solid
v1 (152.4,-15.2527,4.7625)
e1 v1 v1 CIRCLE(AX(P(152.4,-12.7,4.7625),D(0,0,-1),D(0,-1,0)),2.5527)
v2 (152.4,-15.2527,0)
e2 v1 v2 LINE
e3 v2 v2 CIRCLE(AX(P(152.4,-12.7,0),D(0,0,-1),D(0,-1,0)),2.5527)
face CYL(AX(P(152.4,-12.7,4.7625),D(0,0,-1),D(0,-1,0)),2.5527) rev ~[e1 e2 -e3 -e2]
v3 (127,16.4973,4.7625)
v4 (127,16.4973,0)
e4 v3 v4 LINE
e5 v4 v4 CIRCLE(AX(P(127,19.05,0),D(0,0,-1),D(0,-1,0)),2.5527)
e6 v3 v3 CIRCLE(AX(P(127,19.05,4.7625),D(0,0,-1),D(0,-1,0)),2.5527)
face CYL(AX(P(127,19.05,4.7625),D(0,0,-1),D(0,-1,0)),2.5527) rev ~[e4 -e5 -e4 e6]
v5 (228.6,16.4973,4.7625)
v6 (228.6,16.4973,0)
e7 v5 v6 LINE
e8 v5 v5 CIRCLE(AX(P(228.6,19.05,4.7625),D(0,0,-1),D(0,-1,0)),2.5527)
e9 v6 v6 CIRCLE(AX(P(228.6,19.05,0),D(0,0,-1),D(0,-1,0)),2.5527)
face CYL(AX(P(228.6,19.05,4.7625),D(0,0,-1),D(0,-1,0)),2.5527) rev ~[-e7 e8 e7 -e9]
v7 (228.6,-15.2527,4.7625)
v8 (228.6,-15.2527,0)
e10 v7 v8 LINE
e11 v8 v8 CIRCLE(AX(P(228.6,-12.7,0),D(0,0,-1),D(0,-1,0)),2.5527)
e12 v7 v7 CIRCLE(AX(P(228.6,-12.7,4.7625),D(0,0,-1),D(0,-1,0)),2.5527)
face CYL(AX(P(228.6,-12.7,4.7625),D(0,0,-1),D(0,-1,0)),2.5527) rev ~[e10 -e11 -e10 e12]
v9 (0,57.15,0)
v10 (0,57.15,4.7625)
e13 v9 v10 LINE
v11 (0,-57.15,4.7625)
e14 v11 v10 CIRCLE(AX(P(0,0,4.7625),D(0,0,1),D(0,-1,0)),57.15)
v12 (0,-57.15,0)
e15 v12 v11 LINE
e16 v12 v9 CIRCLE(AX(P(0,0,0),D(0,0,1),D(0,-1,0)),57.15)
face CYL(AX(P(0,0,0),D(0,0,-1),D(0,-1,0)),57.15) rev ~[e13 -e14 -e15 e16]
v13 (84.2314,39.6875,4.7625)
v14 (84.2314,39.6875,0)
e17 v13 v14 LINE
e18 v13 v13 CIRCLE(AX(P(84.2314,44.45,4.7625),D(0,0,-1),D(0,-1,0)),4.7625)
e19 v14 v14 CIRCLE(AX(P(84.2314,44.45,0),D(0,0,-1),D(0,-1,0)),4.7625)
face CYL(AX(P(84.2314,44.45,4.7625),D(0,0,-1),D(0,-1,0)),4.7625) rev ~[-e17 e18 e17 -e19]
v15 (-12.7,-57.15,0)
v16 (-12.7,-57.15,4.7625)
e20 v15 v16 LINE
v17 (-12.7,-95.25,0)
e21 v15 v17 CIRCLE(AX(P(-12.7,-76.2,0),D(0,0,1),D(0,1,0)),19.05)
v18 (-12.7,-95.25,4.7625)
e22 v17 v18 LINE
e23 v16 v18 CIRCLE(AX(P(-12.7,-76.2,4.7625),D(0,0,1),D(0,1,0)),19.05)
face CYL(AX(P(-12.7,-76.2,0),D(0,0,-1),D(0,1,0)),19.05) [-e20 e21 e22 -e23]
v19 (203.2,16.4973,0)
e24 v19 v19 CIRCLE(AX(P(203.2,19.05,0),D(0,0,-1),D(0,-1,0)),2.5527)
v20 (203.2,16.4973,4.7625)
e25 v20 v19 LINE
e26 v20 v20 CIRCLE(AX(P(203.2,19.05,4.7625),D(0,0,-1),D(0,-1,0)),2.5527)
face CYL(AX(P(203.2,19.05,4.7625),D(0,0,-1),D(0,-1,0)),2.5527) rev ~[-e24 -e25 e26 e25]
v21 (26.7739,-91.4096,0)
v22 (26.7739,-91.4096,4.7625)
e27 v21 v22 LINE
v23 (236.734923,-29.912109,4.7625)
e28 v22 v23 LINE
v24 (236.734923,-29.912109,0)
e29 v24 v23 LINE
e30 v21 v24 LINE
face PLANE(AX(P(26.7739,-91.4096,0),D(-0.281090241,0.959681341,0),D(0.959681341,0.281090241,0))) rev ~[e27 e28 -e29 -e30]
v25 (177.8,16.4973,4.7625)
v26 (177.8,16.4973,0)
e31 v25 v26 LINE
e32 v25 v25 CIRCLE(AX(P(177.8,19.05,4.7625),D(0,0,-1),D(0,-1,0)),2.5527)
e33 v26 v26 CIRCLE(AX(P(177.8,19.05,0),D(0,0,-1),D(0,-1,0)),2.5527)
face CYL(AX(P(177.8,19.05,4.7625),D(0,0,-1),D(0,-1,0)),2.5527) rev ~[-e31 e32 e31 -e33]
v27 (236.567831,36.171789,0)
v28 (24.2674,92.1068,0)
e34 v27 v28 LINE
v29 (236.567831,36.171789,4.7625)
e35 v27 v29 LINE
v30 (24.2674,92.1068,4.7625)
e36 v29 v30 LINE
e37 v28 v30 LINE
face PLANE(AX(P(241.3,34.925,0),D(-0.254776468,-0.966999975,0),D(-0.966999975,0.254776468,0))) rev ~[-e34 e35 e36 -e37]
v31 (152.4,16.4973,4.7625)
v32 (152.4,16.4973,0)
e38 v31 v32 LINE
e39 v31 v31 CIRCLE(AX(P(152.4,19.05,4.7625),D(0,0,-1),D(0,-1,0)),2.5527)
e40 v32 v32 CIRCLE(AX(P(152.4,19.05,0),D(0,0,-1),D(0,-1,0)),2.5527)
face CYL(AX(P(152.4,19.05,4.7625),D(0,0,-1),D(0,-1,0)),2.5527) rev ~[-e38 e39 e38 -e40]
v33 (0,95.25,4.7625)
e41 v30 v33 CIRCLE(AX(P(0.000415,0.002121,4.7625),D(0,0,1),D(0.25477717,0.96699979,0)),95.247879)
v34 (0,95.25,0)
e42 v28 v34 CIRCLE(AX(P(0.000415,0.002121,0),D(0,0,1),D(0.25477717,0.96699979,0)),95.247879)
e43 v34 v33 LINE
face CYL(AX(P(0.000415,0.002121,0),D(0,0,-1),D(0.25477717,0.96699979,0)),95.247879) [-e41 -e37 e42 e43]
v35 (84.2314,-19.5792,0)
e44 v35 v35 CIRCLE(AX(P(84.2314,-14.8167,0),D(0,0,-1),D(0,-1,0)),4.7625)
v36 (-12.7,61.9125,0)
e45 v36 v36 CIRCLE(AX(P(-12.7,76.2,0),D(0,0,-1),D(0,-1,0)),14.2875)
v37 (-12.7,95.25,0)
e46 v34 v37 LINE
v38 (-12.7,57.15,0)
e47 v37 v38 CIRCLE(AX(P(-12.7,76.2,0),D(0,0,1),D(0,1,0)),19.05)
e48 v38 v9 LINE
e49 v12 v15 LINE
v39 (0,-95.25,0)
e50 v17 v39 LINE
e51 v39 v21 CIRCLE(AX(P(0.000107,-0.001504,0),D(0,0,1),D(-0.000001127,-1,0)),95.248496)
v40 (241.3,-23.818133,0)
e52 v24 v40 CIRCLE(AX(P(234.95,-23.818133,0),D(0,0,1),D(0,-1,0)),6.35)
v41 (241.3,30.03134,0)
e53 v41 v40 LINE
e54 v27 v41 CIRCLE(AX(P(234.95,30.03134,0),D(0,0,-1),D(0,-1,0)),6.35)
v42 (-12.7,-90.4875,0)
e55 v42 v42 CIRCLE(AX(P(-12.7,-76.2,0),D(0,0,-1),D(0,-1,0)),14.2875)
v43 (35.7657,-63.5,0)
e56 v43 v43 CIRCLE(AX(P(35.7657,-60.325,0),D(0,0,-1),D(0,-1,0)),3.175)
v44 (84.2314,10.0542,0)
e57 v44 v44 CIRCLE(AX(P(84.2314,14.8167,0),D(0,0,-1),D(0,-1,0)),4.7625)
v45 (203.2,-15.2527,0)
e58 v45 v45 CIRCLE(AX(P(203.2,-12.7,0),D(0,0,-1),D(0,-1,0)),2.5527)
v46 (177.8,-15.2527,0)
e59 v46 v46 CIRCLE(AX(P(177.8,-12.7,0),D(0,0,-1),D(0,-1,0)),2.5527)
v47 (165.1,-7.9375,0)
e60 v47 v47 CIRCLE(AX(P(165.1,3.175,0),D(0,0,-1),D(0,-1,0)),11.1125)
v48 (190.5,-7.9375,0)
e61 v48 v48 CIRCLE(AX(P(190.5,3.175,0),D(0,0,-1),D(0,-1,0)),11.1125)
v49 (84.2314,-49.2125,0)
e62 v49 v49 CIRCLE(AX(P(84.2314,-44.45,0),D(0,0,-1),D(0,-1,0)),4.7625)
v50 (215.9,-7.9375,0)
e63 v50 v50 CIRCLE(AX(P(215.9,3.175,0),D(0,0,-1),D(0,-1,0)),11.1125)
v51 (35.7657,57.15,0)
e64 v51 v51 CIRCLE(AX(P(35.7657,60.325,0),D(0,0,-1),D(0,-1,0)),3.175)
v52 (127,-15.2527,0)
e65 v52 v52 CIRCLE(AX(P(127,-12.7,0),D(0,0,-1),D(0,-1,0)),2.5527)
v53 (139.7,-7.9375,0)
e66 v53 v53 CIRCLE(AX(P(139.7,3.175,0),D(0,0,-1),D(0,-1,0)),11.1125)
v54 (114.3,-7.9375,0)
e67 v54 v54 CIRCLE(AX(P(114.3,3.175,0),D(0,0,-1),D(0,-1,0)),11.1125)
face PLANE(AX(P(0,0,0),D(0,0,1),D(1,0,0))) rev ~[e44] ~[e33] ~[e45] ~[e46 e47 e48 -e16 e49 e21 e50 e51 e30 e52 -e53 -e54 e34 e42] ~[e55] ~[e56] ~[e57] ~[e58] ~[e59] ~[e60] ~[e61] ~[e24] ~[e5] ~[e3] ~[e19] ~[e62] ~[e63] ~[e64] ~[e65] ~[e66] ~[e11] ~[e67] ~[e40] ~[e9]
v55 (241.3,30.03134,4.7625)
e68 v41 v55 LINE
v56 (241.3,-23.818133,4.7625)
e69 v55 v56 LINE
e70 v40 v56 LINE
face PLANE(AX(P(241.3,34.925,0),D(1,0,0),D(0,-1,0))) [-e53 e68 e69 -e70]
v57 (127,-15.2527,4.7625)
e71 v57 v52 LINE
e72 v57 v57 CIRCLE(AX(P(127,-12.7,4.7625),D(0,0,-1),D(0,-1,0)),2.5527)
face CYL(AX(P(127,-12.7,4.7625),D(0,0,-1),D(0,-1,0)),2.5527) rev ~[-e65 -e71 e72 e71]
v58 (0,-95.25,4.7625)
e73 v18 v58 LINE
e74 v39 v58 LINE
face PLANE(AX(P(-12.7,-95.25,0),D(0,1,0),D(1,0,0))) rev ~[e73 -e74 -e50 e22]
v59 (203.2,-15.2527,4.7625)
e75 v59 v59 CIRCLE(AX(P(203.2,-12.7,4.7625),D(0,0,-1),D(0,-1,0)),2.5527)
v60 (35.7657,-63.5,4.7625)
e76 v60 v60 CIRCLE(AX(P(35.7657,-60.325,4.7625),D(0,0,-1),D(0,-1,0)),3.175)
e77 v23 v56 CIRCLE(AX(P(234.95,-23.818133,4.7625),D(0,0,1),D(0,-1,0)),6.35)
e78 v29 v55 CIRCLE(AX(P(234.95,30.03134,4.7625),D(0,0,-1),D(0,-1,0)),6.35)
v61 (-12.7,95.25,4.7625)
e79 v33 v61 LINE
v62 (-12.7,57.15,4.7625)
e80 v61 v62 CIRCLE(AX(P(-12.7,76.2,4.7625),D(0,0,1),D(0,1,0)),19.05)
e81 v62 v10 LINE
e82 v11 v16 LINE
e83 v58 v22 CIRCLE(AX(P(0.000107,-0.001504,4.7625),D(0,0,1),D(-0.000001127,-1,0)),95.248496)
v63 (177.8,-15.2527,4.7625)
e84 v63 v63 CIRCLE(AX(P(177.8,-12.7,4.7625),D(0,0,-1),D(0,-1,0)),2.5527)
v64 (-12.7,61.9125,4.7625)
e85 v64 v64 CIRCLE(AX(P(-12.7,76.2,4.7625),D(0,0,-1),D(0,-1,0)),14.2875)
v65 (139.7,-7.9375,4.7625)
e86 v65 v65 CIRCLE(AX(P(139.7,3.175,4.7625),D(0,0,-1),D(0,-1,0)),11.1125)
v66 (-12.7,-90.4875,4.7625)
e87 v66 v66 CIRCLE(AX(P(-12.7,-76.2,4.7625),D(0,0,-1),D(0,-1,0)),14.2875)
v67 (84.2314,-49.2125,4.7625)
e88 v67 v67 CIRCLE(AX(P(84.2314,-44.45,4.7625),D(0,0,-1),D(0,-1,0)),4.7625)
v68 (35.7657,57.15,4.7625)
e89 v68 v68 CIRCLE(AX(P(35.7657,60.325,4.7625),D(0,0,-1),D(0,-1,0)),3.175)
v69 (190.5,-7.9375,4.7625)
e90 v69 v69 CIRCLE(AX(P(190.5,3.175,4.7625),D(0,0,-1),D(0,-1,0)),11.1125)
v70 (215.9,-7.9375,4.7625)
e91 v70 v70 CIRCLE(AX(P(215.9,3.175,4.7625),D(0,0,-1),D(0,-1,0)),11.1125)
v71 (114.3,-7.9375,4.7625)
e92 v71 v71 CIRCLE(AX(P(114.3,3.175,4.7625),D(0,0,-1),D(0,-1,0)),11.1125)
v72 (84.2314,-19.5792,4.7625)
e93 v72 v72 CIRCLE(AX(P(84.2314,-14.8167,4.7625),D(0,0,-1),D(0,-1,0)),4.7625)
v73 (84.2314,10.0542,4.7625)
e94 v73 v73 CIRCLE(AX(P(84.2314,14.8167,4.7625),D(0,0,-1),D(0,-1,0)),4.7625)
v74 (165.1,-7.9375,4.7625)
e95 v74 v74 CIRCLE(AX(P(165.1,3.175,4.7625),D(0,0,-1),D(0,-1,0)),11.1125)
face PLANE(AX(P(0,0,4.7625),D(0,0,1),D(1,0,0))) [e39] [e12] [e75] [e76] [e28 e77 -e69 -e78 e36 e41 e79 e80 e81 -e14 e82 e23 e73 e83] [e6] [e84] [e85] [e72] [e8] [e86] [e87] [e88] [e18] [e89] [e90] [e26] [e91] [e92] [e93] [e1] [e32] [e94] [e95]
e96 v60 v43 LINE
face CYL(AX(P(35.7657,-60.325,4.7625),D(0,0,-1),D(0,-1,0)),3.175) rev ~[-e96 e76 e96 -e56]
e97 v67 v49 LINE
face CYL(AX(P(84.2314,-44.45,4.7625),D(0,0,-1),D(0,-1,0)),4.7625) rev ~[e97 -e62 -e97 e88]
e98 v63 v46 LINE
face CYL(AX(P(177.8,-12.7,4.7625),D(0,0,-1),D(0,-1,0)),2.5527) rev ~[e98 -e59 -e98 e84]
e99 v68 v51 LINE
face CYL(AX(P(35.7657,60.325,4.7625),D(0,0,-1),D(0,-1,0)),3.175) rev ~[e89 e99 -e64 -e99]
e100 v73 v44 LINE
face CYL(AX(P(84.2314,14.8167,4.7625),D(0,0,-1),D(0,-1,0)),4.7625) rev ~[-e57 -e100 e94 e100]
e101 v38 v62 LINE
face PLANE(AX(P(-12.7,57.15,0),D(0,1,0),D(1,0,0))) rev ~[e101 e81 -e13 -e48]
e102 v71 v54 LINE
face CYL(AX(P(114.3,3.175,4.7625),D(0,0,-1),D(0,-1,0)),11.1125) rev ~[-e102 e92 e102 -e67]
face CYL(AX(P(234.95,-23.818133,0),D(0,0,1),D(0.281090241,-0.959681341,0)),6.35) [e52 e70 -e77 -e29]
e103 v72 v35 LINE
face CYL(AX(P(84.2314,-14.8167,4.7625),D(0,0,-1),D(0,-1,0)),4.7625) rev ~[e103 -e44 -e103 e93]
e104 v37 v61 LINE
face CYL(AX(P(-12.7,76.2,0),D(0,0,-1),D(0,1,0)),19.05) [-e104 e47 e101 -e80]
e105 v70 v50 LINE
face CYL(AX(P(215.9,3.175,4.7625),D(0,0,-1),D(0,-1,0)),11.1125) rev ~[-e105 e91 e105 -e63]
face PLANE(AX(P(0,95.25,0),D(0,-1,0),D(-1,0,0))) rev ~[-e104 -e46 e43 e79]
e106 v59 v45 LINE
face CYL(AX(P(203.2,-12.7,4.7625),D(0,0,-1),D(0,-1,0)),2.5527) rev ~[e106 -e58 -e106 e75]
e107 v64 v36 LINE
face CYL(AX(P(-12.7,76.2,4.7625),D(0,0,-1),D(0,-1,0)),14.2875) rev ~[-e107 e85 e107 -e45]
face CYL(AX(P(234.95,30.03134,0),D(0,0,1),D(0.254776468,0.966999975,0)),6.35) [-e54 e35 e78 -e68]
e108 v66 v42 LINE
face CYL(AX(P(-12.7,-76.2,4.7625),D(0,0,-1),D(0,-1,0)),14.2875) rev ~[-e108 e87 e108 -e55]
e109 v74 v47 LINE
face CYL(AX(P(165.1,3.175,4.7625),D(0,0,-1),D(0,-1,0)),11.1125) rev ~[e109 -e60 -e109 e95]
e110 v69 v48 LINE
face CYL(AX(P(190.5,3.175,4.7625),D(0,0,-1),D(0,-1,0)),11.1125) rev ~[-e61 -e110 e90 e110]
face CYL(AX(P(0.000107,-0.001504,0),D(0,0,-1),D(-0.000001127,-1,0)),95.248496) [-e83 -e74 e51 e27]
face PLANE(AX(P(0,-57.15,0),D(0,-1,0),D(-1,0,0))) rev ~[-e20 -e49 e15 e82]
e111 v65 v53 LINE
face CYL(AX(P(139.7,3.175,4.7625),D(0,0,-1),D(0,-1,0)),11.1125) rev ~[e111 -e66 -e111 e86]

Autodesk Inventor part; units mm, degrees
ref_plane "YZ Plane" through (0, 0, 0) normal (1, 0, 0) x (0, 1, 0)
ref_plane "XZ Plane" through (0, 0, 0) normal (0, 1, 0) x (-1, 0, 0)
ref_plane "XY Plane" through (0, 0, 0) normal (0, 0, 1) x (1, 0, 0)
sketch "Sketch2" plane through (0, 0, 0) normal (0, 0, 1) x (1, 0, 0)
  arc A0 (0, -57.15) -> (0, 57.15) centre (0, 0) ccw
  line L0 (241.3, 34.925) -> (241.3, -28.575)
  line L1 (-90.17, 0) -> (296.545, 0) construction
  arc A1 (0, -95.25) -> (26.7739, -91.4096) centre (0, 0) ccw
  arc A2 (24.2674, 92.1068) -> (0, 95.25) centre (0, 0) ccw
  line L2 (26.7739, -91.4096) -> (241.3, -28.575)
  line L3 (241.3, 34.925) -> (24.2674, 92.1068)
  line L4 (0, 95.25) -> (-12.7, 95.25)
  arc A3 (-12.7, 95.25) -> (-12.7, 57.15) centre (-12.7, 76.2) ccw
  line L5 (-12.7, 57.15) -> (0, 57.15)
  line L6 (0, -57.15) -> (-12.7, -57.15)
  arc A4 (-12.7, -57.15) -> (-12.7, -95.25) centre (-12.7, -76.2) ccw
  line L7 (-12.7, -95.25) -> (0, -95.25)
  circle A5 centre (-12.7, -76.2) radius 22.225 construction
  circle A6 centre (-12.7, 76.2) radius 22.225 construction
  line L8 (0, 137.795) -> (0, -137.795) construction
  point P0 (57.15, 0)
  point P1 (241.3, 3.175)
  dimension "d0" = 114.3
  dimension "d1" = 63.5
  dimension "d20" = 12.7
  dimension "d21" = 19.05
  dimension "d63" = 44.45
  dimension "d65" = 57.15
  dimension "d73" = 241.3
  dimension "d78" = 3.175
extrude "Plate1" add sketch "Sketch2" along normal blind 4.7625
sketch "Sketch3" plane through (0, 0, 4.7625) normal (0, 0, 1) x (1, 0, 0)
  line L0 (241.3, 34.925) -> (241.3, -28.575) construction
  line L1 (-86.36, 0) -> (295.91, 0) construction
  line L2 (228.6, 19.05) -> (228.6, -12.7) construction
  point P0 (0, 0)
  dimension "d7" = 31.75
  dimension "d8" = 12.7
  dimension "d75" = 19.05
hole "Hole1" at (228.6, 19.05, 4.7625) at (228.6, -12.7, 4.7625) direction (0, 0, -1) diameter 5.1054 end through all clearance for "Flat Head Machine Screw (82)" size "#10" standard "Ansi Unified Screw Threads"
pattern_linear "Rectangular Pattern1" count 5 spacing 25.4 along (-1, 0, 0) of "Hole1"
sketch "Sketch4" plane through (0, 0, 4.7625) normal (0, 0, 1) x (1, 0, 0)
  arc A0 (-12.7, 95.25) -> (-12.7, 57.15) centre (-12.7, 76.2) ccw construction
  arc A1 (-12.7, -57.15) -> (-12.7, -95.25) centre (-12.7, -76.2) ccw construction
  line L0 (-12.7, 76.2) -> (84.2314, 44.45) construction
  line L1 (-86.36, 0) -> (295.91, 0) construction
  line L2 (-12.7, -76.2) -> (84.2314, -44.45) construction
  circle A2 centre (84.2314, 44.45) radius 11.43 construction
  circle A3 centre (-12.7, 76.2) radius 11.43 construction
  line L3 (-9.1421, 87.0621) -> (87.7893, 55.3121) construction
  line L4 (-16.2579, 65.3379) -> (80.6735, 33.5879) construction
  line L5 (84.2314, 14.8167) -> (84.2314, -14.8167) construction
  point P0 (0, 0)
  point P1 (-12.7, -76.2)
  point P2 (84.2314, 0)
  dimension "d29" = 101.9988
  dimension "d30" = 44.45
  dimension "d38" = 22.86
  dimension "d39" = 29.6333
  dimension "d40" = 29.6333
  dimension "d41" = 29.6333
hole "Hole2" at (-12.7, 76.2, 4.7625) at (-12.7, -76.2, 4.7625) direction (0, 0, -1) diameter 28.575 end through all
hole "Hole3" at (84.2314, 44.45, 4.7625) at (84.2314, -44.45, 4.7625) at (84.2314, 14.8167, 4.7625) at (84.2314, -14.8167, 4.7625) direction (0, 0, -1) diameter 9.525 end through all
sketch "Sketch5" plane through (0, 0, 4.7625) normal (0, 0, 1) x (1, 0, 0)
  arc A0 (0, -57.15) -> (0, 57.15) centre (0, 0) ccw construction
  line L0 (-12.7, -57.15) -> (0, -57.15) construction
  arc A1 (-12.7, -57.15) -> (-12.7, -95.25) centre (-12.7, -76.2) ccw construction
  line L1 (0, -95.25) -> (-12.7, -95.25) construction
  arc A2 (0, -95.25) -> (26.7739, -91.4096) centre (0, 0) ccw construction
  line L2 (241.3, -28.575) -> (26.7739, -91.4096) construction
  line L3 (0, 57.15) -> (-12.7, 57.15) construction
  arc A3 (-12.7, 95.25) -> (-12.7, 57.15) centre (-12.7, 76.2) ccw construction
  line L4 (-12.7, 95.25) -> (0, 95.25) construction
  arc A4 (24.2674, 92.1068) -> (0, 95.25) centre (0, 0) ccw construction
  line L5 (24.2674, 92.1068) -> (241.3, 34.925) construction
  line L6 (197.4777, 33.3375) -> (105.4027, 57.5966)
  arc A5 (21.0318, 79.8259) -> (12.7, 81.5672) centre (0, 0) ccw
  arc A6 (69.85, 0) -> (53.5082, 44.8987) centre (0, 0) ccw construction
  line L7 (77.4255, 64.9677) -> (53.5082, 44.8987)
  line L8 (12.7, 81.5672) -> (12.7, 68.6858)
  line L9 (-86.36, 0) -> (295.91, 0) construction
  line L10 (241.3, 34.925) -> (241.3, -28.575) construction
  arc A7 (53.5082, 44.8987) -> (12.7, 68.6858) centre (0, 0) ccw
  line L11 (77.4255, 64.9677) -> (21.0318, 79.8259)
  line L12 (105.4027, 57.5966) -> (105.4027, 33.3375)
  line L13 (105.4027, 33.3375) -> (197.4777, 33.3375)
  line L14 (105.4027, 57.5966) -> (77.4255, 64.9677) construction
  line L15 (105.4027, -55.1457) -> (201.5387, -26.9875)
  line L16 (201.5387, -26.9875) -> (105.4027, -26.9875)
  line L17 (105.4027, -26.9875) -> (105.4027, -55.1457)
  circle A8 centre (152.4, 19.05) radius 2.5527 construction
  circle A9 centre (152.4, -12.7) radius 2.5527 construction
  point P0 (0, 0)
  dimension "d42" = 12.7
  dimension "d43" = 12.7
  dimension "d44" = 25.4
  dimension "d45" = 50
  dimension "d47" = 33.3375
  dimension "d48" = 92.075
  dimension "d66" = 12.7
  dimension "d67" = 26.9875
  dimension "d76" = 14.2875
  dimension "d77" = 14.2875
cut "Cut1" [suppressed]
cut "Cut2" [suppressed]
sketch "Sketch6" plane through (0, 0, 4.7625) normal (0, 0, 1) x (1, 0, 0)
  circle A0 centre (228.6, 19.05) radius 2.5527 construction
  circle A1 centre (203.2, -12.7) radius 2.5527 construction
  line L0 (228.6, 19.05) -> (203.2, -12.7) construction
  point P0 (0, 0)
  point P1 (215.9, 3.175)
hole "Hole4" at (215.9, 3.175, 4.7625) direction (0, 0, -1) diameter 22.225 end through all
pattern_linear "Rectangular Pattern2" count 5 spacing 25.4 along (-1, 0, 0) of "Hole4"
feature "Corner Round1" [suppressed]
mirror "Mirror2" [suppressed]
sketch "Sketch7" plane through (0, 0, 4.7625) normal (0, 0, 1) x (1, 0, 0)
  circle A0 centre (-12.7, 76.2) radius 14.2875 construction
  circle A1 centre (-12.7, -76.2) radius 14.2875 construction
  circle A2 centre (84.2314, -44.45) radius 4.7625 construction
  circle A3 centre (84.2314, 44.45) radius 4.7625 construction
  line L0 (84.2314, 44.45) -> (-12.7, 76.2) construction
  line L1 (-12.7, -76.2) -> (84.2314, -44.45) construction
  line L2 (59.9985, 52.3875) -> (64.9401, 67.4738) construction
  line L3 (59.9985, -52.3875) -> (64.9401, -67.4738) construction
  point P0 (0, 0)
  point P1 (35.7657, 60.325)
  point P2 (35.7657, -60.325)
  dimension "d86" = 25.4997
  dimension "d87" = 50.9994
  dimension "d88" = 25.4997
  dimension "d89" = 15.875
hole "Hole5" at (35.7657, 60.325, 4.7625) at (35.7657, -60.325, 4.7625) direction (0, 0, -1) diameter 6.35 end through all
fillet "Corner Round3" radius 6.35 2 edges at (241.3, -28.575, 2.3813) (241.3, 34.925, 2.3813)
equation "\"d14\" = Thickness"
equation "\"d39\" = d40"
equation "\"d66\" = d42"
equation "\"d86\" = 0.5 * d87"
equation "\"d88\" = d86"
equation "\"d49\" = Thickness"
equation "\"d68\" = Thickness"
equation "\"d84\" = Thickness"
equation "\"d6\" = Thickness"
equation "\"BendRadius\" = 1.5 * Thickness"
equation "\"BendReliefWidth\" = Thickness"
equation "\"BendReliefDepth\" = 0.5 * Thickness"
equation "\"CornerReliefSize\" = 4 * Thickness"
equation "\"MinimumRemnant\" = 2 * Thickness"
equation "\"TransitionRadius\" = BendRadius"
equation "\"JacobiRadiusSize\" = BendRadius"
equation "\"GapSize\" = Thickness"
equation "\"Thickness\" = 4.7625"
properties part number "PLATE,END_EFFECTOR,ARM" material "Polycarbonate, Clear"
